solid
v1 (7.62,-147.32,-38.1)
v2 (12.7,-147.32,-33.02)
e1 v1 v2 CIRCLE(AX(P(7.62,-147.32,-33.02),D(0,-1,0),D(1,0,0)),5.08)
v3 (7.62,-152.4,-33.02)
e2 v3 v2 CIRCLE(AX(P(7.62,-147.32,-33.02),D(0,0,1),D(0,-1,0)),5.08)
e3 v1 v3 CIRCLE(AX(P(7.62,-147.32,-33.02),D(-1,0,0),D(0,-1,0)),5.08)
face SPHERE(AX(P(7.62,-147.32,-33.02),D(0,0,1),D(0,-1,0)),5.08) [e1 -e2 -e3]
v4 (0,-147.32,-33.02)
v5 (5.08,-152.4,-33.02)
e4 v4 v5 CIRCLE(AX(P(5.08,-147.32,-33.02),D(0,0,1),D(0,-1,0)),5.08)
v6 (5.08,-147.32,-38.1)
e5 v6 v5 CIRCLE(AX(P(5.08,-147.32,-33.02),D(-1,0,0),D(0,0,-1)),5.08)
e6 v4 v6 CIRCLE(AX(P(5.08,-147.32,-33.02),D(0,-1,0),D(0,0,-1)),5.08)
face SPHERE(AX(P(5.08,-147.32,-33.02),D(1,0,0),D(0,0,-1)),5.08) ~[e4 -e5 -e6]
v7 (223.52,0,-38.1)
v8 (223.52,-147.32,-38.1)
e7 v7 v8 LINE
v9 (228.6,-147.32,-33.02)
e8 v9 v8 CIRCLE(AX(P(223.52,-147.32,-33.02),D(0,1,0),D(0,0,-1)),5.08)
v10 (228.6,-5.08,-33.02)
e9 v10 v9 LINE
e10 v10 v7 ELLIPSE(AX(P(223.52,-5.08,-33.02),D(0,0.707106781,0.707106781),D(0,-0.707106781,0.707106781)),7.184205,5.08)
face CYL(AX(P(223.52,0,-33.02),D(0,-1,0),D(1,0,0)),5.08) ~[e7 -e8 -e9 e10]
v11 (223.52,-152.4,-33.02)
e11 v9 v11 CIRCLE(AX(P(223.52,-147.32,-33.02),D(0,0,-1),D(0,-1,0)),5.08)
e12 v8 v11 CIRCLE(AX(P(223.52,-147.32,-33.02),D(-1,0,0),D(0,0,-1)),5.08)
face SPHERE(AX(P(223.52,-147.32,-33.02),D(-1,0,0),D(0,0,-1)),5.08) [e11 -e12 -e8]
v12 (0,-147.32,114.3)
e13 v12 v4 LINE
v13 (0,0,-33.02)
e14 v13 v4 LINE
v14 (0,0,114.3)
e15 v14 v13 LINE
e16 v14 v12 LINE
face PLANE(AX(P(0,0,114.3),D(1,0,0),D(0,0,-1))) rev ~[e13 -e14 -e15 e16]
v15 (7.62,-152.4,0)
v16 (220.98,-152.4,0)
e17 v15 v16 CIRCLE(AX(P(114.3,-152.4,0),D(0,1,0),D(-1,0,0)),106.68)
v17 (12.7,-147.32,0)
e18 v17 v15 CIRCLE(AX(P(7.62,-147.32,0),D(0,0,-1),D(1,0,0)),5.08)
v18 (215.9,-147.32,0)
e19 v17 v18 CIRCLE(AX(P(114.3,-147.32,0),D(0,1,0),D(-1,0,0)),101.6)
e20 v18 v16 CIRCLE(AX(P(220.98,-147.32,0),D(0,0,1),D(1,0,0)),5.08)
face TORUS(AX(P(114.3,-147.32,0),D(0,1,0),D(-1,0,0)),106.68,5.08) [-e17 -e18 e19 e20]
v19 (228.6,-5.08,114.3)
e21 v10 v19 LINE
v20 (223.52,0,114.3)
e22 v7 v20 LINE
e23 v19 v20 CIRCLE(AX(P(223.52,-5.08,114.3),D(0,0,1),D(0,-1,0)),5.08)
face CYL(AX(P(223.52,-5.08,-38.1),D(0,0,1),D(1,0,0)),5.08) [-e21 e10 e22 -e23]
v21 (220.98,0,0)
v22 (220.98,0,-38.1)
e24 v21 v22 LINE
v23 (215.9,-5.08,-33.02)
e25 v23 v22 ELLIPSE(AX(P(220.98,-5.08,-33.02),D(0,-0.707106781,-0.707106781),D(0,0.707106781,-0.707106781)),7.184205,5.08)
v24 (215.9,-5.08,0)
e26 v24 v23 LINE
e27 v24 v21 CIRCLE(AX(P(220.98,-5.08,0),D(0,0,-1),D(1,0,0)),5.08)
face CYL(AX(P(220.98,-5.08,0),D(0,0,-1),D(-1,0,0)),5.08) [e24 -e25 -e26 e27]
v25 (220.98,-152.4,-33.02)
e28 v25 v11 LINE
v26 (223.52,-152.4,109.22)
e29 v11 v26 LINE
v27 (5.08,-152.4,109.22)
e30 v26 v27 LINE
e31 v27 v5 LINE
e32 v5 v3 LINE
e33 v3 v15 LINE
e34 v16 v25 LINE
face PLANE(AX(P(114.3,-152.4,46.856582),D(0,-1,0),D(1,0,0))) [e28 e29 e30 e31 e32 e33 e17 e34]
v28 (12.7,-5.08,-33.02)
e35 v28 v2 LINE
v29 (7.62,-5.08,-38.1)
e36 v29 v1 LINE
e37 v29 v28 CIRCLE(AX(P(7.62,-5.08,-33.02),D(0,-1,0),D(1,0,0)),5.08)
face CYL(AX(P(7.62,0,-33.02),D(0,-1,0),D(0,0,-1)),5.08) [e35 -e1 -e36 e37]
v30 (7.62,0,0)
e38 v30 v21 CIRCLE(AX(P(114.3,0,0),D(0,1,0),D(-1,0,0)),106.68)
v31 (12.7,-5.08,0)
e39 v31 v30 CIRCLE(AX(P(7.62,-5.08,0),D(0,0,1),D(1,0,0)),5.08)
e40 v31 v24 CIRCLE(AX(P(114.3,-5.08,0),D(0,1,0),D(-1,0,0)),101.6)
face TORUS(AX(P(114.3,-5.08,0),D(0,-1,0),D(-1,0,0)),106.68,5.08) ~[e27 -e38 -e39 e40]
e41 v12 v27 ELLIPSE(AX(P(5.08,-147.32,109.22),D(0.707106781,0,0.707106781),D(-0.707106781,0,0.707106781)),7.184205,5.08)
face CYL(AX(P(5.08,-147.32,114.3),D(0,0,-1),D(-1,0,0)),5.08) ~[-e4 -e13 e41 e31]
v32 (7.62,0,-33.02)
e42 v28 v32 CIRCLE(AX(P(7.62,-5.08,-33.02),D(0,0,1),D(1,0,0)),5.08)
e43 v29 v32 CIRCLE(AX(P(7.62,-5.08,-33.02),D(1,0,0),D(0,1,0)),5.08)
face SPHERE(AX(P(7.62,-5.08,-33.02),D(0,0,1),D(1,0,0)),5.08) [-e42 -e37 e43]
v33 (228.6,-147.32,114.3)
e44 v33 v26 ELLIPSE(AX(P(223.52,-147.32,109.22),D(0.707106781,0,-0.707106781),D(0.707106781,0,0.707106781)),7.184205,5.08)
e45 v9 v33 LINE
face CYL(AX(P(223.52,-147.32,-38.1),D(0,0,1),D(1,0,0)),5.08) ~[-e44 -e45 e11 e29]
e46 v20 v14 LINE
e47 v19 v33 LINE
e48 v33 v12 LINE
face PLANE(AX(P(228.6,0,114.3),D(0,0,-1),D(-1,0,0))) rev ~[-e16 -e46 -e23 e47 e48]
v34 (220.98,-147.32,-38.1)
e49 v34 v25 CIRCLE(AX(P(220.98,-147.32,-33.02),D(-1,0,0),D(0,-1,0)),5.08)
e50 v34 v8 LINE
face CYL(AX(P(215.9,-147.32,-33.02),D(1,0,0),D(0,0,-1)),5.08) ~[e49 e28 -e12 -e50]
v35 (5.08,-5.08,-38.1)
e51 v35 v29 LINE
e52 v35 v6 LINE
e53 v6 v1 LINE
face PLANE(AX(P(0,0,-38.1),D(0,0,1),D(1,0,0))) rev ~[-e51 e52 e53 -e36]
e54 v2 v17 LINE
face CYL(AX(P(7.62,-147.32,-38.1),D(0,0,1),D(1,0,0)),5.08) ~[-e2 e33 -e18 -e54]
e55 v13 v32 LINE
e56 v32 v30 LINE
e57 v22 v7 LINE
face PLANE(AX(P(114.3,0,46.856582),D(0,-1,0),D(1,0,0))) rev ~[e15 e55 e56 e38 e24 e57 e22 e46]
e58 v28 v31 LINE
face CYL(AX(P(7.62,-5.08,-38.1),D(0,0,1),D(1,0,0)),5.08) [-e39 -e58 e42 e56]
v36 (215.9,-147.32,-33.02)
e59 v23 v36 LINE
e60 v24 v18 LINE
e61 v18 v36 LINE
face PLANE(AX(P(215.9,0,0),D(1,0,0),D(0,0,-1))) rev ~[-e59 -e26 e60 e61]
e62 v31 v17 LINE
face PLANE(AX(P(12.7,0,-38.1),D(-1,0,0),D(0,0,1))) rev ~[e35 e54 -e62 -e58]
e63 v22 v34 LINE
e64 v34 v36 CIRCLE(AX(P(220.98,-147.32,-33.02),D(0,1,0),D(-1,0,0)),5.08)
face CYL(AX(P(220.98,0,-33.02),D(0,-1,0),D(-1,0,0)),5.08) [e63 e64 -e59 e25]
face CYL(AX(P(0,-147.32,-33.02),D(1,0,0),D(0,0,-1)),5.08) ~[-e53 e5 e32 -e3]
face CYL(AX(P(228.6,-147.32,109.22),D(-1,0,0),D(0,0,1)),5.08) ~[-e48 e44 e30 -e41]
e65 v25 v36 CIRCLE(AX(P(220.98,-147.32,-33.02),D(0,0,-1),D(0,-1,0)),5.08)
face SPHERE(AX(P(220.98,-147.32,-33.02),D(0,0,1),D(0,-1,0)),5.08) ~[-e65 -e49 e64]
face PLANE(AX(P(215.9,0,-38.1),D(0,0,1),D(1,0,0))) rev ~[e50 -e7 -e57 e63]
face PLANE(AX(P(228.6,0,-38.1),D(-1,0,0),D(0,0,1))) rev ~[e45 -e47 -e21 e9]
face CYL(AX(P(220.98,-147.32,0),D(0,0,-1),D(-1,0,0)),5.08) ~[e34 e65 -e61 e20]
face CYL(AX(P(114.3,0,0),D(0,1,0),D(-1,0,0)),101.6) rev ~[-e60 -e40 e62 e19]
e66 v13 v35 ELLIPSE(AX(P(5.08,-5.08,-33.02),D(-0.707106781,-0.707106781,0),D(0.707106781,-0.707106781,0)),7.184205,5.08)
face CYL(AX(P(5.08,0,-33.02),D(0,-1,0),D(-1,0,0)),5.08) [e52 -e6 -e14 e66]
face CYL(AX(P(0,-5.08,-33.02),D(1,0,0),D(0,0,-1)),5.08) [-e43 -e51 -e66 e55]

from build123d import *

# Parameters (mm, degrees)
F1_DEPTH = 152.4
F2_R     = 5.08


# Not quite as in the source:
# - two fillets or chamfers of one size are made in one step
# - a feature names something its author has since deleted; it is built from what else it names


with BuildPart() as f1:
    # F0 (on Front) → F1 (new body)
    with BuildSketch(Plane.XZ):
        with BuildLine():
            Line((228.6, -38.1), (228.6, 0))
            ThreePointArc((228.6, 0), (195.1223050896, 80.8223050896), (114.3, 114.3))
            ThreePointArc((114.3, 114.3), (33.4776949104, 80.8223050896), (0, 0))
            Line((0, 0), (0, -38.1))
            Line((0, -38.1), (12.7, -38.1))
            Line((12.7, -38.1), (12.7, 0))
            ThreePointArc((12.7, 0), (114.3, 101.6), (215.9, 0))
            Line((215.9, 0), (215.9, -38.1))
            Line((215.9, -38.1), (228.6, -38.1))
        make_face()
        with BuildLine():
            ThreePointArc((114.3, 114.3), (195.1223050896, 80.8223050896), (228.6, 0))
            Line((228.6, 0), (228.6, 114.3))
            Line((228.6, 114.3), (114.3, 114.3))
        make_face()
        with BuildLine():
            ThreePointArc((0, 0), (33.4776949104, 80.8223050896), (114.3, 114.3))
            Line((114.3, 114.3), (0, 114.3))
            Line((0, 114.3), (0, 0))
        make_face()
    extrude(amount=F1_DEPTH)

    # F2
    f2_edges = [f1.edges().sort_by_distance(p)[0] for p in [
        (114.3, -152.4, 101.6),
        (114.3, 0, 101.6),
        (222.25, -152.4, -38.1),
        (6.35, -152.4, -38.1),
        (12.7, -76.2, -38.1),
        (0, -76.2, -38.1),
        (6.35, 0, -38.1),
        (215.9, -76.2, -38.1),
        (215.9, 0, -19.05),
        (215.9, -152.4, -19.05),
        (228.6, -76.2, -38.1),
        (228.6, 0, 38.1),
        (228.6, -152.4, 38.1),
        (114.3, -152.4, 114.3),
        (0, -152.4, 38.1),
        (12.7, 0, -19.05),
        (12.7, -152.4, -19.05),
    ]]
    fillet(f2_edges, radius=F2_R)


solid = f1.part
